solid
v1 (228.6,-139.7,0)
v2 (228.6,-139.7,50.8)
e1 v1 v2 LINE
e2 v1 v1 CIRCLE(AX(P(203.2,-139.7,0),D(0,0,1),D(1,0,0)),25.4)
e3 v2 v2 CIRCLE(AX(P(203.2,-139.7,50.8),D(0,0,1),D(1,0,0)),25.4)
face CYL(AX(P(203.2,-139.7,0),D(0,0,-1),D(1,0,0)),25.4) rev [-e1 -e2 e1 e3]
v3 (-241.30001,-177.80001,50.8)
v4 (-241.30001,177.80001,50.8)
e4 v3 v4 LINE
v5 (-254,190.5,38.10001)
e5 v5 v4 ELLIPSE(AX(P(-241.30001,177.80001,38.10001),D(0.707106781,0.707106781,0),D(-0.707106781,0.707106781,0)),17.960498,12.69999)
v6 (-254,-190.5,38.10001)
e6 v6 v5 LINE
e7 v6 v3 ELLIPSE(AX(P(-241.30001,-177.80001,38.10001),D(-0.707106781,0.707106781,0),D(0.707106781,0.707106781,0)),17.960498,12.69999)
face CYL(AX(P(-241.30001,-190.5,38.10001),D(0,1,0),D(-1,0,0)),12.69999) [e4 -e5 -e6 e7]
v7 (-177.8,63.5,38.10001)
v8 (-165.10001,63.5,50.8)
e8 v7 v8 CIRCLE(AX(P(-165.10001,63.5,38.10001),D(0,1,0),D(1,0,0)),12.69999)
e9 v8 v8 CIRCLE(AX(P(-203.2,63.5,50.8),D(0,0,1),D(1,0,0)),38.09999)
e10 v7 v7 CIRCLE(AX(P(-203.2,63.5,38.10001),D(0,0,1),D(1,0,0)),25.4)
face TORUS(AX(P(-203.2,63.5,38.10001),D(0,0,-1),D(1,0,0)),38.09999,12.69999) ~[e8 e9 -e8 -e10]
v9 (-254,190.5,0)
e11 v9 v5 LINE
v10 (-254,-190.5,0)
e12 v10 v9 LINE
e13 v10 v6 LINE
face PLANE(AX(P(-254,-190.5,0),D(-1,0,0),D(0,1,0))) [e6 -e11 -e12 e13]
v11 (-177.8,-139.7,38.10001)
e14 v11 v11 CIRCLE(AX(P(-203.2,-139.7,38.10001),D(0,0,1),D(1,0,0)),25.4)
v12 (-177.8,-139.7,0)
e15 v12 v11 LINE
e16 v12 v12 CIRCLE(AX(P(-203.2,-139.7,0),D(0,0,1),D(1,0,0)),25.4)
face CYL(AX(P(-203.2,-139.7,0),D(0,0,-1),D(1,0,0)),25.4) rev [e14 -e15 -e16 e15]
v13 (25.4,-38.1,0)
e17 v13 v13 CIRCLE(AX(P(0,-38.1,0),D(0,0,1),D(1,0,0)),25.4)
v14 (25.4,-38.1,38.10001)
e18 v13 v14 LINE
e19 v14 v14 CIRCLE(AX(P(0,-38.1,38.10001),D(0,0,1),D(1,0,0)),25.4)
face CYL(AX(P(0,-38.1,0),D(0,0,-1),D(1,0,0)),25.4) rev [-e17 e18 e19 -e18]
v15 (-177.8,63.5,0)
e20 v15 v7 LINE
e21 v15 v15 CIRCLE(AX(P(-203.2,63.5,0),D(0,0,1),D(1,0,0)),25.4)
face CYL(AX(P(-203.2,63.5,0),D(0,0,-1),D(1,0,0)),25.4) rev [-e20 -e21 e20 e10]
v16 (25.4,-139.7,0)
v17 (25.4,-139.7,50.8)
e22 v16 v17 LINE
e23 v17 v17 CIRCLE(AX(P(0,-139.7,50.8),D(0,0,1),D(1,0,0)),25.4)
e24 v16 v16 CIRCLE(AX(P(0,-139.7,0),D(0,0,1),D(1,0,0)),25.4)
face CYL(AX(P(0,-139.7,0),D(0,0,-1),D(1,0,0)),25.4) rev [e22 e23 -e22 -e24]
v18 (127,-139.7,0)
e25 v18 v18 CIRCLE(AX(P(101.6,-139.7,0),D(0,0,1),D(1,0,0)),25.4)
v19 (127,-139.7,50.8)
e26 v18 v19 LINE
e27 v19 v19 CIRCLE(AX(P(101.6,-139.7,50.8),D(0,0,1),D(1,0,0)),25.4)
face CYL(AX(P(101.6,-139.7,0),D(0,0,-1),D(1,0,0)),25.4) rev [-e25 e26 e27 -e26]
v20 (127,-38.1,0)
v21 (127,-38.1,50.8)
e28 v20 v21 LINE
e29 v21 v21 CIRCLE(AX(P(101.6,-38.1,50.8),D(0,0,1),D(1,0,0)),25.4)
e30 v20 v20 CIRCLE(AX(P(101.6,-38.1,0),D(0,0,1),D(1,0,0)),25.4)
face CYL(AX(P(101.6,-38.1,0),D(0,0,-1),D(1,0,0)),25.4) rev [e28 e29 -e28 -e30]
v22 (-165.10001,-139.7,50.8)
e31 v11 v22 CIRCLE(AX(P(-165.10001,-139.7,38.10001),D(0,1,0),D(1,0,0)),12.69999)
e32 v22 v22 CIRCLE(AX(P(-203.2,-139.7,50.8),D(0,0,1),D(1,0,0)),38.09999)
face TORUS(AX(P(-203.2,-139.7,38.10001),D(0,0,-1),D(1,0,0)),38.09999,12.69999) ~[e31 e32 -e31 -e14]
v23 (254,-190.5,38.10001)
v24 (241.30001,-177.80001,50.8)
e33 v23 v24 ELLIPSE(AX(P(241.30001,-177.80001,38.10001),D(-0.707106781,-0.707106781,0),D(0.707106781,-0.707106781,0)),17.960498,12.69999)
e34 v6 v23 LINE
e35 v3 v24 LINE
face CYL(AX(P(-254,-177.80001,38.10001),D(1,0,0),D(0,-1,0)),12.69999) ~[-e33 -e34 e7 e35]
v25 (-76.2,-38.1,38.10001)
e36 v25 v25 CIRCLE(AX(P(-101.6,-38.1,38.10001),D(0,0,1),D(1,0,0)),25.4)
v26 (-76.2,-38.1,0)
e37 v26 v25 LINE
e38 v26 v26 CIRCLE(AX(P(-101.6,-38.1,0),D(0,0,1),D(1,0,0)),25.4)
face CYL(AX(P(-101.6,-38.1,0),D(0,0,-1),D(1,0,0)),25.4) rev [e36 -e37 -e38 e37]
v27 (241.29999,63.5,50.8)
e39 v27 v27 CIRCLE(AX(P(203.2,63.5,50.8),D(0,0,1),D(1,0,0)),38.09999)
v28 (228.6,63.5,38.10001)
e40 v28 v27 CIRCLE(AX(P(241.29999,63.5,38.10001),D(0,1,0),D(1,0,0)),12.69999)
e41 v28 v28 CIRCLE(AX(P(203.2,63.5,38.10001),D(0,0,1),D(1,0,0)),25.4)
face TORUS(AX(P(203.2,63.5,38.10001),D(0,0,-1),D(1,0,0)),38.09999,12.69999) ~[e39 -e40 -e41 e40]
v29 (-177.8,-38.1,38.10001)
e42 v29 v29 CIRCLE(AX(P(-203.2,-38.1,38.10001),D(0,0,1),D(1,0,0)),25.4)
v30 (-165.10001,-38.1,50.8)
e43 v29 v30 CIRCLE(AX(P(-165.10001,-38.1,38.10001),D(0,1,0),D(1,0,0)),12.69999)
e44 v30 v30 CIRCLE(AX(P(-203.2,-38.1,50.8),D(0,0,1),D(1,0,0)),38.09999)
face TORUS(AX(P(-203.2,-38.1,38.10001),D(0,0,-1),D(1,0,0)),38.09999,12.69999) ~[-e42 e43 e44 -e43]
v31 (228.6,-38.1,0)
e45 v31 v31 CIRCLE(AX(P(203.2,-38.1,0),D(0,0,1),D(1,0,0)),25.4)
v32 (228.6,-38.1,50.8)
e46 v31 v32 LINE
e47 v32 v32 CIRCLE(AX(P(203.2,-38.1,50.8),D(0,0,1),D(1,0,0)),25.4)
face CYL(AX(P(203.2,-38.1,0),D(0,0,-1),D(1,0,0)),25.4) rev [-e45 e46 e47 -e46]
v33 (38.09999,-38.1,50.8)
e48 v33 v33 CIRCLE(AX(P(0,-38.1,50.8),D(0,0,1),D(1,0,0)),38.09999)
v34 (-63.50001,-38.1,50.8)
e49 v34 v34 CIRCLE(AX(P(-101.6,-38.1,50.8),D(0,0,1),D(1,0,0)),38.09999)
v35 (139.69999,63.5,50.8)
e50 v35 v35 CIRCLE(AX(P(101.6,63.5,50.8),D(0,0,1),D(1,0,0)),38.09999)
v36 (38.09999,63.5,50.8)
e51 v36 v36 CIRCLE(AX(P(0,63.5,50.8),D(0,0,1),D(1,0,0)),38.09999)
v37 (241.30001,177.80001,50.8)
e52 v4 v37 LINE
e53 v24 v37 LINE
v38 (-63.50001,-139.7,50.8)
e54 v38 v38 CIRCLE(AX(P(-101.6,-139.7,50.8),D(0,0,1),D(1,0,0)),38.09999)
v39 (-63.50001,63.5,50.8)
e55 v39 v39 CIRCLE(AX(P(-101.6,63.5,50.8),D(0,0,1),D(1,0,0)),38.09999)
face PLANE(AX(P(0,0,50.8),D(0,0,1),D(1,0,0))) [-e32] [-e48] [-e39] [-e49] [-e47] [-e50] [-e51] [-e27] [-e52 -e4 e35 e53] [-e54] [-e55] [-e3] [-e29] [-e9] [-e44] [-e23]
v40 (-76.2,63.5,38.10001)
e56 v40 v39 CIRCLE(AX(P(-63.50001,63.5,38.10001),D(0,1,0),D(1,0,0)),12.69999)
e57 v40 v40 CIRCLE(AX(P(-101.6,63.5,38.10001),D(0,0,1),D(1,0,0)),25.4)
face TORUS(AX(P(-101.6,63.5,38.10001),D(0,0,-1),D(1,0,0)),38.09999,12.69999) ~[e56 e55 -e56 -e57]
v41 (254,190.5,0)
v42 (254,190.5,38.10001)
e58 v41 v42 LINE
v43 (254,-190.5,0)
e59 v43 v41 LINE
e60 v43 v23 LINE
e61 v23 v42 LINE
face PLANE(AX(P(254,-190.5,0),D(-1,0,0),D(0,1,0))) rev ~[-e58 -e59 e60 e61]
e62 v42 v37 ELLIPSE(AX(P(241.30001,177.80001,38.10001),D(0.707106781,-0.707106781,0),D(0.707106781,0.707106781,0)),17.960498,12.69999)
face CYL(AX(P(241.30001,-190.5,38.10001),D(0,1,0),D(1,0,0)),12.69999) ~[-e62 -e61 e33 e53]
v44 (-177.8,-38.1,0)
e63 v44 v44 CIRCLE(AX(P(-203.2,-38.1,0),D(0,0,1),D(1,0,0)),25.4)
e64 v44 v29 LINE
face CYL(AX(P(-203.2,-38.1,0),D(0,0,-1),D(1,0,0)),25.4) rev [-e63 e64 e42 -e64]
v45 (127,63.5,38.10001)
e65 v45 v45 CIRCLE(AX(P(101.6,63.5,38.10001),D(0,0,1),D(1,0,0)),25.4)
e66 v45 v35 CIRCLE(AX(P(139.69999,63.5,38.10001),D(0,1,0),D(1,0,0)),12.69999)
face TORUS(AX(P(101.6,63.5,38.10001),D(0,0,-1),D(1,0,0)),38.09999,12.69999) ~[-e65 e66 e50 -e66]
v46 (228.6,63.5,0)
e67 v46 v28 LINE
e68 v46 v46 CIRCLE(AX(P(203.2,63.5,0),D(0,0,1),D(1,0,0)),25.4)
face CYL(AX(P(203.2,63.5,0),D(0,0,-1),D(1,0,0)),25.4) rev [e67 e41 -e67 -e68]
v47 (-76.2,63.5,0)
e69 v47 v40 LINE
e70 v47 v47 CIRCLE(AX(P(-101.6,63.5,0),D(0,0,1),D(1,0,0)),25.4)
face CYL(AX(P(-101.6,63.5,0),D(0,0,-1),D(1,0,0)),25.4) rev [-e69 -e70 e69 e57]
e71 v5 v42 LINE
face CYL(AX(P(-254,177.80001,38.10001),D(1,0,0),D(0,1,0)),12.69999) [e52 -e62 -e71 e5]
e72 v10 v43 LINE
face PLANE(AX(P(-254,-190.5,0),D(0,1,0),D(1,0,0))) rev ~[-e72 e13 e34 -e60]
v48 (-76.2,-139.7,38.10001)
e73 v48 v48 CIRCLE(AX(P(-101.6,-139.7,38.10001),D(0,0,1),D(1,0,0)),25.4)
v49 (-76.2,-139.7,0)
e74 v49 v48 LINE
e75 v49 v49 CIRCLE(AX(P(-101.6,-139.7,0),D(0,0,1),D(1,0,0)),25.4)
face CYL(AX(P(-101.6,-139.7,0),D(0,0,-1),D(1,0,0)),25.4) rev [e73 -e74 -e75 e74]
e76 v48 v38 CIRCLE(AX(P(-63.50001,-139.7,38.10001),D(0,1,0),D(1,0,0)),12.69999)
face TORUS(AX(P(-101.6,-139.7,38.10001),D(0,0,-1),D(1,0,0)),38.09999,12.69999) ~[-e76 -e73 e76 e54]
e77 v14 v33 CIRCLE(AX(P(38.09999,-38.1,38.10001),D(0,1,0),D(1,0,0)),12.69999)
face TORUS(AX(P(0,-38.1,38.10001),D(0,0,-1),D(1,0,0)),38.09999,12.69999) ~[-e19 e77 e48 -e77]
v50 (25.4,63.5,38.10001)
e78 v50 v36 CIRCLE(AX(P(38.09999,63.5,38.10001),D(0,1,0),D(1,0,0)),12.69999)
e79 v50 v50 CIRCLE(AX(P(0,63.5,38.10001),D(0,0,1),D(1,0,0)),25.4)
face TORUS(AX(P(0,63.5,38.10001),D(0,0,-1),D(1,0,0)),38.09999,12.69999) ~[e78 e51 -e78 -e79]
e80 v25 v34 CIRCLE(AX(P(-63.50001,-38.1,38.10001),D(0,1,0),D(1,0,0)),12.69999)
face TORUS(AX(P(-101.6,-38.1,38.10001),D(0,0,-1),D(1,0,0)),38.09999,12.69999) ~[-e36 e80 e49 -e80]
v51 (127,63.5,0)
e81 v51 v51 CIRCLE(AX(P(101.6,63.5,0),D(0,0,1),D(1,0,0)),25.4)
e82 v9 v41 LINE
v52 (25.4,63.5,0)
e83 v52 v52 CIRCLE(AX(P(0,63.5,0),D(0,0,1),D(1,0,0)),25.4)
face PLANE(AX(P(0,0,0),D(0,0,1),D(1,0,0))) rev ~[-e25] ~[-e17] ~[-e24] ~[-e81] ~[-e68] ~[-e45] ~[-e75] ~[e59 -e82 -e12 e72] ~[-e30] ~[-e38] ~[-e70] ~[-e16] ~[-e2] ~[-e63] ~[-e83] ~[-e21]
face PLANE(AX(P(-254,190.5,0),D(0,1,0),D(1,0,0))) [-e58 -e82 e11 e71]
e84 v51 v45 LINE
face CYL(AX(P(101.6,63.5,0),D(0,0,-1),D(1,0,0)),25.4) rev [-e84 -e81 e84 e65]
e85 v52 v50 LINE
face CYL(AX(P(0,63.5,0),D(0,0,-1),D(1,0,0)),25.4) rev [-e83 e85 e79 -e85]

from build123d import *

# Parameters (mm, degrees)
F0_W     = 508
F0_H     = 381
F0_R     = 25.4
F1_DEPTH = 50.8
F2_R     = 12.69999


# Not quite as in the source:
# - a fillet or chamfer is up to 0.001 mm smaller than in the source, because OpenCascade refuses the exact size


with BuildPart() as f1:
    # F0 (on Top) → F1 (new body)
    with BuildSketch(Plane.XY):
        Rectangle(F0_W, F0_H)
        with Locations((-203.2, -139.7)):
            Circle(F0_R, mode=Mode.SUBTRACT)
        with Locations((-101.6, -139.7)):
            Circle(F0_R, mode=Mode.SUBTRACT)
        with Locations((0, -139.7)):
            Circle(F0_R, mode=Mode.SUBTRACT)
        with Locations((101.6, -139.7)):
            Circle(F0_R, mode=Mode.SUBTRACT)
        with Locations((203.2, -139.7)):
            Circle(F0_R, mode=Mode.SUBTRACT)
        with Locations((-203.2, -38.1)):
            Circle(F0_R, mode=Mode.SUBTRACT)
        with Locations((-101.6, -38.1)):
            Circle(F0_R, mode=Mode.SUBTRACT)
        with Locations((-203.2, 63.5)):
            Circle(F0_R, mode=Mode.SUBTRACT)
        with Locations((-101.6, 63.5)):
            Circle(F0_R, mode=Mode.SUBTRACT)
        with Locations((0, -38.1)):
            Circle(F0_R, mode=Mode.SUBTRACT)
        with Locations((0, 63.5)):
            Circle(F0_R, mode=Mode.SUBTRACT)
        with Locations((101.6, -38.1)):
            Circle(F0_R, mode=Mode.SUBTRACT)
        with Locations((203.2, -38.1)):
            Circle(F0_R, mode=Mode.SUBTRACT)
        with Locations((101.6, 63.5)):
            Circle(F0_R, mode=Mode.SUBTRACT)
        with Locations((203.2, 63.5)):
            Circle(F0_R, mode=Mode.SUBTRACT)
    extrude(amount=F1_DEPTH)

    # F2 (radius 12.7 in the source; OpenCascade refuses exactly that, so slightly less here)
    f2_edges = [f1.edges().sort_by_distance(p)[0] for p in [
        (-254, 0, 50.8),
        (0, -190.5, 50.8),
        (0, 190.5, 50.8),
        (254, 0, 50.8),
        (177.8, 63.5, 50.8),
        (76.2, 63.5, 50.8),
        (-25.4, 63.5, 50.8),
        (-127, 63.5, 50.8),
        (-228.6, 63.5, 50.8),
        (-228.6, -38.1, 50.8),
        (-228.6, -139.7, 50.8),
        (-127, -139.7, 50.8),
        (-127, -38.1, 50.8),
        (-25.4, -38.1, 50.8),
    ]]
    fillet(f2_edges, radius=F2_R)


solid = f1.part
